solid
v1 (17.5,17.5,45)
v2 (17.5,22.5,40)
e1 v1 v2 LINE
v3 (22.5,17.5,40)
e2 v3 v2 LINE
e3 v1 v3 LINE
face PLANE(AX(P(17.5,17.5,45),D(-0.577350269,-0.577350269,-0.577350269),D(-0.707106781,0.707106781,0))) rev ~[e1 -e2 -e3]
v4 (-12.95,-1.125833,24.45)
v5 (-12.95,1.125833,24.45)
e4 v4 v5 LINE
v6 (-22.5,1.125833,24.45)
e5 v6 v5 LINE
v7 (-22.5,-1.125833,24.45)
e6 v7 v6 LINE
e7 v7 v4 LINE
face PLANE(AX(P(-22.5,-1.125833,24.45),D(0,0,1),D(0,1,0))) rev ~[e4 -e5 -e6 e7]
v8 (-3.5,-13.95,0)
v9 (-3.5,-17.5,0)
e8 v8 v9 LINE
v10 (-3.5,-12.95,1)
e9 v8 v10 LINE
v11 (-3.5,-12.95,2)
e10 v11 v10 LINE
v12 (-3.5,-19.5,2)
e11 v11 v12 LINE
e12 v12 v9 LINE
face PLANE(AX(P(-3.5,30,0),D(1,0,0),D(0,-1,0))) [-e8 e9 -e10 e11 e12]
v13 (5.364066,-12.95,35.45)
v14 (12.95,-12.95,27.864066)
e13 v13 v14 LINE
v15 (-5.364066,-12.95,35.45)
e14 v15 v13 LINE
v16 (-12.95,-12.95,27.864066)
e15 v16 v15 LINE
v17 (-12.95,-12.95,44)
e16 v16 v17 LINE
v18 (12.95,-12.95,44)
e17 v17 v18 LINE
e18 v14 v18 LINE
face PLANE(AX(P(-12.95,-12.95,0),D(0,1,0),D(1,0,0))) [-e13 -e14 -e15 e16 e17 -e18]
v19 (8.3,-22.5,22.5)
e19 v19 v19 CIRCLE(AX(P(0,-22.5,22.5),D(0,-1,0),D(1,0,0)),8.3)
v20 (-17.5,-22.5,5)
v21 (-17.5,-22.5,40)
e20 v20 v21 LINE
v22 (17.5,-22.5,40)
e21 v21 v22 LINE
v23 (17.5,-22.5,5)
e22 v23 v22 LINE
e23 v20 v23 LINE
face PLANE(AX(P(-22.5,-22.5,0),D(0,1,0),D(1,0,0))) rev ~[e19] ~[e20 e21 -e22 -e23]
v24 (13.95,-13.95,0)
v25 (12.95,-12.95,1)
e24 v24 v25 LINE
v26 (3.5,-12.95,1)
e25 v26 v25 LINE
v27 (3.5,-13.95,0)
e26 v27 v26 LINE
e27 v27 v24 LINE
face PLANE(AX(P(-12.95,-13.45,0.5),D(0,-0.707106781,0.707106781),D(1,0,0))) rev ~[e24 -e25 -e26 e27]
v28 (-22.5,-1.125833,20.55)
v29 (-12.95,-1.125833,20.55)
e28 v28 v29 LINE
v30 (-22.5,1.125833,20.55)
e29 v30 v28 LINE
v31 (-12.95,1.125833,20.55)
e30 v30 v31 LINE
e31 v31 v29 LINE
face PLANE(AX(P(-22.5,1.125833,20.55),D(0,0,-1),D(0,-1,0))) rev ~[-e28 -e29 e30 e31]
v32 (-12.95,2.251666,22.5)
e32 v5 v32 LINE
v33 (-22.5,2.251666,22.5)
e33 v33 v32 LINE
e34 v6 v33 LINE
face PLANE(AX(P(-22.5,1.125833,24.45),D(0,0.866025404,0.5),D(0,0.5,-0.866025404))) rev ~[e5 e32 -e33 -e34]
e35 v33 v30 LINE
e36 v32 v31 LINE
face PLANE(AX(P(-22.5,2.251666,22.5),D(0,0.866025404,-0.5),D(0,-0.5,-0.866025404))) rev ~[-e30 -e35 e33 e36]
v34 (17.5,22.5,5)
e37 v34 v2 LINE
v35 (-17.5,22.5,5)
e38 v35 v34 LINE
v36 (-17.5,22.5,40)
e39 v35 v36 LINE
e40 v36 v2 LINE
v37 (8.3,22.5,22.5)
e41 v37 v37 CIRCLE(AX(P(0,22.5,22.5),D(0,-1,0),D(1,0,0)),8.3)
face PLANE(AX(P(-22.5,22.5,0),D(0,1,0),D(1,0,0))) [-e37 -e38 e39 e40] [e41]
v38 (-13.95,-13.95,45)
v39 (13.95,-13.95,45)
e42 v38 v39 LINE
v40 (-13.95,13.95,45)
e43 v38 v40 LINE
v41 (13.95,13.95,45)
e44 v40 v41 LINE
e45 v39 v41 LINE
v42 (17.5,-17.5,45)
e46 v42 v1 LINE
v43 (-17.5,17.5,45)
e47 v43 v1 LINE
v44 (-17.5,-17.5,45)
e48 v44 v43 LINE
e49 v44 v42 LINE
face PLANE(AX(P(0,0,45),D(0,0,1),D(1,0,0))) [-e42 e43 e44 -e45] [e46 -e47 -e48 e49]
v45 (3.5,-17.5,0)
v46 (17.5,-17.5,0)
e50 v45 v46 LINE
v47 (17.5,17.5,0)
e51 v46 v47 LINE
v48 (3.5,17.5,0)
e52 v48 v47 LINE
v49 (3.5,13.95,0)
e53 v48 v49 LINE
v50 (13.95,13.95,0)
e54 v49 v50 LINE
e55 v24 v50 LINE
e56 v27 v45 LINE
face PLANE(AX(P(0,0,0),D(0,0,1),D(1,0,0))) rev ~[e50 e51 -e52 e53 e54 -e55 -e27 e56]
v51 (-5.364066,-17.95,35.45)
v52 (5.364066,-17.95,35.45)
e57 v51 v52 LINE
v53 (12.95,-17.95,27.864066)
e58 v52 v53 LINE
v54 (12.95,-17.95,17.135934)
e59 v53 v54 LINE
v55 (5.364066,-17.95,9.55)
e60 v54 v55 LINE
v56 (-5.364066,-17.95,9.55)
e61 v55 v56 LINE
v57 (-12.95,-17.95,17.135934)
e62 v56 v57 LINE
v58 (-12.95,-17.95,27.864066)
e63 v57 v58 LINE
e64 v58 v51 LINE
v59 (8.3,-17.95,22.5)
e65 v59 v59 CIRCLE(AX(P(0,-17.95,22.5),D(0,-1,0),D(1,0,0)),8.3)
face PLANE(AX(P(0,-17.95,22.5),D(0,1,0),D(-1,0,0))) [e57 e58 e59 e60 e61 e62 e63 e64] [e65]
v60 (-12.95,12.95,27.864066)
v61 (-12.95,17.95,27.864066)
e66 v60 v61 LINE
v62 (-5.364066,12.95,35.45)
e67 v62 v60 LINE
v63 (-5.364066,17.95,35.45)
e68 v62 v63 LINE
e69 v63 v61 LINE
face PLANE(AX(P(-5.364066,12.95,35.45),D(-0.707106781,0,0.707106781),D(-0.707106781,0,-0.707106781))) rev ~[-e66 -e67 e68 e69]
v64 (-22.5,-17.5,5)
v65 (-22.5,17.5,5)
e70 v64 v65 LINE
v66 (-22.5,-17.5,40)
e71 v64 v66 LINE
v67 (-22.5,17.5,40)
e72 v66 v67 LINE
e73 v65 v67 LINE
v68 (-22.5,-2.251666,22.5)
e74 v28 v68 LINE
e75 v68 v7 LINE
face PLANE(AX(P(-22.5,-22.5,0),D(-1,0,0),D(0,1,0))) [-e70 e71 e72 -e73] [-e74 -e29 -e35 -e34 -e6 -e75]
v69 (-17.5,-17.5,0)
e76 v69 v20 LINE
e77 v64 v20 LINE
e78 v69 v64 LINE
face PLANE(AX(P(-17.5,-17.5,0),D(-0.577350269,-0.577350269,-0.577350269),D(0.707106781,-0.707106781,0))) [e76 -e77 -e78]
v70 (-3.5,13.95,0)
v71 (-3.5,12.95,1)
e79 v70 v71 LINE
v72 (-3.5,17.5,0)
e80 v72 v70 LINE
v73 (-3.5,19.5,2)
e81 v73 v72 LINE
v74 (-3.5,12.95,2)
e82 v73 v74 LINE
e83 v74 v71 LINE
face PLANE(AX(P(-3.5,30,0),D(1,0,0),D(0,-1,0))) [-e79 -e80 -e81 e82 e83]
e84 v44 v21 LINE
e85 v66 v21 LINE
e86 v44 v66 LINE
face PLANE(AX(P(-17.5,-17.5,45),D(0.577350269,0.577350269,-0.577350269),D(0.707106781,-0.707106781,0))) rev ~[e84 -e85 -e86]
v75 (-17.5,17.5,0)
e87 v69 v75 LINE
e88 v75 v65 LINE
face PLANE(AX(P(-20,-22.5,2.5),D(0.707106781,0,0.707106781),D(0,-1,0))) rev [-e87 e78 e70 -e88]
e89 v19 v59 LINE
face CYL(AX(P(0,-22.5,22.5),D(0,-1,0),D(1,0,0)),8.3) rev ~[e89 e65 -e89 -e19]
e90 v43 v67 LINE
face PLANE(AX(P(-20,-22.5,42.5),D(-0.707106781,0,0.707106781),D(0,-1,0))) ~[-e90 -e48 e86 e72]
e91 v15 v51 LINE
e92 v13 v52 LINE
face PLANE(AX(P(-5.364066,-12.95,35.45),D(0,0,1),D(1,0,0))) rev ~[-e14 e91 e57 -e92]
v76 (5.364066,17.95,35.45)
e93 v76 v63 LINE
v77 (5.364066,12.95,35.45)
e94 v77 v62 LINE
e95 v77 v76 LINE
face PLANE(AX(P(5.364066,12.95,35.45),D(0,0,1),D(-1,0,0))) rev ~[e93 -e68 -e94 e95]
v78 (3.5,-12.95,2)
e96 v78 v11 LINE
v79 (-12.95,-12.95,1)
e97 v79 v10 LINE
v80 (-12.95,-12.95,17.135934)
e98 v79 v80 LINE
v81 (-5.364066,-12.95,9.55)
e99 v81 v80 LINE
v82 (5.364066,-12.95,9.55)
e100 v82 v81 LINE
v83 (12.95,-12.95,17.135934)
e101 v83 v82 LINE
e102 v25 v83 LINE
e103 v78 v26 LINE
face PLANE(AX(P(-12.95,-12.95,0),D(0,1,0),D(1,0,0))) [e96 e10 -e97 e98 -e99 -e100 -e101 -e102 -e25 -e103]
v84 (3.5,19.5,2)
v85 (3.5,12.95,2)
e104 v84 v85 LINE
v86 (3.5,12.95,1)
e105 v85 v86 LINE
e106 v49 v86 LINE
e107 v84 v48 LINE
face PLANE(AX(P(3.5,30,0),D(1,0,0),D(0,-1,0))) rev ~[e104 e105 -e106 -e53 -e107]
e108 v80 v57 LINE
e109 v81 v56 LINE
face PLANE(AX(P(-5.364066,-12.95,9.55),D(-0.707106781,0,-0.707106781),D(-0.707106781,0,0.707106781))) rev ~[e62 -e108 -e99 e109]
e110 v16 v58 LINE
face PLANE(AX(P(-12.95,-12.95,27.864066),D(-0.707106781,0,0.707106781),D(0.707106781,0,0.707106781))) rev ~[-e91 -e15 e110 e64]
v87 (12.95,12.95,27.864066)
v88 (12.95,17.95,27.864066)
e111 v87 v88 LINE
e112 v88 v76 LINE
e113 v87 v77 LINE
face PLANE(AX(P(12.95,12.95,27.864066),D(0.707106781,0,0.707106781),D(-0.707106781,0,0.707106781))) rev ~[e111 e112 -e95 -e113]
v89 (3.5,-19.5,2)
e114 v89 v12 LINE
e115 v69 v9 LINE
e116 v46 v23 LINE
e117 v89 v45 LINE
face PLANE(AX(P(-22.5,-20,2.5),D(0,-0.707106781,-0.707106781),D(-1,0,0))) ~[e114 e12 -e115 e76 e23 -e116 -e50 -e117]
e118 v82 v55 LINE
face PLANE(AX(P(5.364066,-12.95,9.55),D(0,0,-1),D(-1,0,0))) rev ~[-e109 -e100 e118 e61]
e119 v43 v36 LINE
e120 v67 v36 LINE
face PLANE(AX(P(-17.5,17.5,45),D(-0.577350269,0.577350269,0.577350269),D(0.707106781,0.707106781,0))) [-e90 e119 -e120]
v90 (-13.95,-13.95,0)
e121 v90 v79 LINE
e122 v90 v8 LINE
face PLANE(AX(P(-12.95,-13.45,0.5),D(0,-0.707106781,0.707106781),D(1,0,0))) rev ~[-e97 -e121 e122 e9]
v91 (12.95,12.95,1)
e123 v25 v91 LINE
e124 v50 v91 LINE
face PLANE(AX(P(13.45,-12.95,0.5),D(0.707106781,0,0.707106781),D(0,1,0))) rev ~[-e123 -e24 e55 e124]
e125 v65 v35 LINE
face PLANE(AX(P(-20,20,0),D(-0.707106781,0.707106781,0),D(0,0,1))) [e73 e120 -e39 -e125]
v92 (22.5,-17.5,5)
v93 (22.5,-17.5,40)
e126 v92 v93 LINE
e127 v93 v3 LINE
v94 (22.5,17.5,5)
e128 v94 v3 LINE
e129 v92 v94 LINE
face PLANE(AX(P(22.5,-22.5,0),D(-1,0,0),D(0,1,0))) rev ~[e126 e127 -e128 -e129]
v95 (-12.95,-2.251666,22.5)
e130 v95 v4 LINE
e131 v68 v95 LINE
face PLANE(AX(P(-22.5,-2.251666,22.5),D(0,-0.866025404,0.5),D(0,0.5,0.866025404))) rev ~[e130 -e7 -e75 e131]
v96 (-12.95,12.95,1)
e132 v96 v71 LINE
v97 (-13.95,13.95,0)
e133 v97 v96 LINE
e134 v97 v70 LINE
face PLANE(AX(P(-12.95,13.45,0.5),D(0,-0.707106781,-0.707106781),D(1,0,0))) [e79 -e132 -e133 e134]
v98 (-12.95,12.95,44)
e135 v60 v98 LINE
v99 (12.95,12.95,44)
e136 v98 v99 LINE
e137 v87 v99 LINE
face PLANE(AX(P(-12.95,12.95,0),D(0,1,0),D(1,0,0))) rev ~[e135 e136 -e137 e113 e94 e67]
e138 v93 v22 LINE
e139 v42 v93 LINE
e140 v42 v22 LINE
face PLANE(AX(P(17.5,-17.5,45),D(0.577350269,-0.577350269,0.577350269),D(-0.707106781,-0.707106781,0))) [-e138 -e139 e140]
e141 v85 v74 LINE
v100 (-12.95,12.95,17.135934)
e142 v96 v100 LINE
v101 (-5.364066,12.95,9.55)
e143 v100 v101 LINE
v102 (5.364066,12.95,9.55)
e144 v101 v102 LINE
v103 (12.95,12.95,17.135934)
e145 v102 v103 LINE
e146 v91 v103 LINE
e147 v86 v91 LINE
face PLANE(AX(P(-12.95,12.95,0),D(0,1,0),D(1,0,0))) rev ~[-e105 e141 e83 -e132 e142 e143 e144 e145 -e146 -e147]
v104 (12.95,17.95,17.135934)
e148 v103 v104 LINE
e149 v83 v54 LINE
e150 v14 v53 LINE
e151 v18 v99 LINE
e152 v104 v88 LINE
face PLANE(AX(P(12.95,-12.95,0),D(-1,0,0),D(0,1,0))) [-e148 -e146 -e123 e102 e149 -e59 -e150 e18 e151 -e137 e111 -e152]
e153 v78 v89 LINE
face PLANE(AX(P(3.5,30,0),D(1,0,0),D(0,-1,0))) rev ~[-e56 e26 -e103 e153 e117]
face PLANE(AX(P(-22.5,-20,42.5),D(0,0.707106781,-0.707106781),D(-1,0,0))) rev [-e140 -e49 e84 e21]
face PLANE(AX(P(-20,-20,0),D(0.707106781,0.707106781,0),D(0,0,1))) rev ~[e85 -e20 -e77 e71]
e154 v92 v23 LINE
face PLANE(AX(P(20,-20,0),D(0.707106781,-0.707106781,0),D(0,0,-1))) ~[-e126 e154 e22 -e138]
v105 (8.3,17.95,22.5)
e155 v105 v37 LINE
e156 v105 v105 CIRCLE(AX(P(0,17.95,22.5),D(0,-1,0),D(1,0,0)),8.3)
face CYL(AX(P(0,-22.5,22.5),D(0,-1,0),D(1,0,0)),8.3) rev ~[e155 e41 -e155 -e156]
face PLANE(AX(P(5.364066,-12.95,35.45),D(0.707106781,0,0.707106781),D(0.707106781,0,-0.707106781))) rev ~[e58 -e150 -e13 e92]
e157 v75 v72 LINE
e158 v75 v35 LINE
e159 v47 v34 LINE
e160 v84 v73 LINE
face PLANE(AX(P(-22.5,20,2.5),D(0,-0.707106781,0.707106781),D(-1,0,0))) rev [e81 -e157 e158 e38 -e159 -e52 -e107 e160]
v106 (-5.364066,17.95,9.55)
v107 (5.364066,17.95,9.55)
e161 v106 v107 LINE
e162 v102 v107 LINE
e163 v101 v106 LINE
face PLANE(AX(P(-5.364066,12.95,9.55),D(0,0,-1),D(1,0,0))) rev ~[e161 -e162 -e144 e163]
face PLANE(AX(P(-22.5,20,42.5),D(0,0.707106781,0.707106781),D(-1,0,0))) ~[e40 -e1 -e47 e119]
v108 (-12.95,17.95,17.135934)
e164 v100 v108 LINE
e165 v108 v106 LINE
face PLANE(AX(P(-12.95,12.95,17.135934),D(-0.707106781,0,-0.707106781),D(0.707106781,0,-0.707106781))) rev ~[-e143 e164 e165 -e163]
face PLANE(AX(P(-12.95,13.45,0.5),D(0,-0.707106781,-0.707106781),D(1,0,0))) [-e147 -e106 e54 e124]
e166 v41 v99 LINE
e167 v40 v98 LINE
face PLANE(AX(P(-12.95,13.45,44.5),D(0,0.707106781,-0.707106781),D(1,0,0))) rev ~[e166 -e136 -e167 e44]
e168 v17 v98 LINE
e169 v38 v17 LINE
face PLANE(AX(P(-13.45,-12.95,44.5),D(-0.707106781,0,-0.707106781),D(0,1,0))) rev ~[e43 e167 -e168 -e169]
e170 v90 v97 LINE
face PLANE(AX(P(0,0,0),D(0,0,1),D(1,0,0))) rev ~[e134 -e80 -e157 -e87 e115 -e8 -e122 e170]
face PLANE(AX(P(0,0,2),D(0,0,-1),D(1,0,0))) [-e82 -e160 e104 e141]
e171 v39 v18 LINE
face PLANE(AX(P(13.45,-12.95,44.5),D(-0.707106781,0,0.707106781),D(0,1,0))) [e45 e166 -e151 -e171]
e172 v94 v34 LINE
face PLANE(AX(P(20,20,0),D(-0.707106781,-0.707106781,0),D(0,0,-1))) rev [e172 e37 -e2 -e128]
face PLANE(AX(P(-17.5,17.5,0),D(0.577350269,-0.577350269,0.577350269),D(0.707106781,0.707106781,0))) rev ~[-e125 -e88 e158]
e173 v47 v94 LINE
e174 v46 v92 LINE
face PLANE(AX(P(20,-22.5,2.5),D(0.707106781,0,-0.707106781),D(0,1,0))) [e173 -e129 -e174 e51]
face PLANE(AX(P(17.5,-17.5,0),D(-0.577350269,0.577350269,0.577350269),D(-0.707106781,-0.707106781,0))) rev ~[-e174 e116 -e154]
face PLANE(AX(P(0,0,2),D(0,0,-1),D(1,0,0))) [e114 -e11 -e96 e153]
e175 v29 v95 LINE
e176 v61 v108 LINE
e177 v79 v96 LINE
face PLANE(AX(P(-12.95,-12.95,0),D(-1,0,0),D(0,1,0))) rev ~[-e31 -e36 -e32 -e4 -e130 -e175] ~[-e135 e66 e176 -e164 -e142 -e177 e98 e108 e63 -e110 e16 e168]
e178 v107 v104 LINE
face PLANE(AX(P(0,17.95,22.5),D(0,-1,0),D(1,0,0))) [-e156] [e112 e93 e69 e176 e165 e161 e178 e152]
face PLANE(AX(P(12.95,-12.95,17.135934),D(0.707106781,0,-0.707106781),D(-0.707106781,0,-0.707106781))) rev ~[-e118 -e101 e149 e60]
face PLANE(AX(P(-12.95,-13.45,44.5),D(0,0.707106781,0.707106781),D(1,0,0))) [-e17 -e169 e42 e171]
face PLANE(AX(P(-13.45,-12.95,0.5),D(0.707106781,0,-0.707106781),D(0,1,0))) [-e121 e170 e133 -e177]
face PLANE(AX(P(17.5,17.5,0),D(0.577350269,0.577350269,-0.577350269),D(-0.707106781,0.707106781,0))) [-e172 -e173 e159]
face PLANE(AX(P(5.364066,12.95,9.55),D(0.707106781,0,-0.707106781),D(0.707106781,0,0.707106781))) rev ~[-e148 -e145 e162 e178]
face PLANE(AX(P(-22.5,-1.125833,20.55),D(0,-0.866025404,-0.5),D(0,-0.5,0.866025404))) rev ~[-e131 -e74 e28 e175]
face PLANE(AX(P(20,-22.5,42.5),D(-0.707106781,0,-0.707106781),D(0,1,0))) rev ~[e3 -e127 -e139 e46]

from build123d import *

# Parameters (mm, degrees)
F0_W      = 45
F0_H      = 45
F0_W_2    = 25.9
F0_H_2    = 25.9
F1_DEPTH  = 45
F2_R      = 8.3
F3_DEPTH  = 45.001
F5_DEPTH  = 5
F7_DEPTH  = 5
F9_SIZE   = 5
F10_DEPTH = 9.55
F11_SIZE  = 1
F12_W     = 7
F12_H     = 60
F13_DEPTH = 2


# Not quite as in the source:
# - a feature names something its author has since deleted; it is built from what else it names


with BuildPart() as f1:
    # F0 (on Top) → F1 (new body)
    with BuildSketch(Plane.XY):
        Rectangle(F0_W, F0_H)
        Rectangle(F0_W_2, F0_H_2, mode=Mode.SUBTRACT)
    extrude(amount=F1_DEPTH)

    # F2 (on face) → F3 (cut, through all)
    with BuildSketch(Plane.XZ.offset(22.5)):
        with Locations((0, 22.5)):
            Circle(F2_R)
    extrude(amount=-F3_DEPTH, mode=Mode.SUBTRACT)

    # F4 (on face) → F5 (cut)
    with BuildSketch(Plane.XZ.offset(-12.95)):
        Polygon((12.95, 17.1359343673), (12.95, 27.8640656327), (5.3640656327, 35.45), (-5.3640656327, 35.45), (-12.95, 27.8640656327), (-12.95, 17.1359343673), (-5.3640656327, 9.55), (5.3640656327, 9.55), align=None)
    extrude(amount=-F5_DEPTH, mode=Mode.SUBTRACT)

    # F6 (on face) → F7 (cut)
    with BuildSketch(Plane(origin=(0, -12.95, 0), x_dir=(-1, 0, 0), z_dir=(0, 1, 0))):
        Polygon((12.95, 17.1359343673), (12.95, 27.8640656327), (5.3640656327, 35.45), (-5.3640656327, 35.45), (-12.95, 27.8640656327), (-12.95, 17.1359343673), (-5.3640656327, 9.55), (5.3640656327, 9.55), align=None)
    extrude(amount=-F7_DEPTH, mode=Mode.SUBTRACT)

    # F9
    f9_edges = [f1.edges().sort_by_distance(p)[0] for p in [
        (22.5, -22.5, 22.5),
        (22.5, 22.5, 22.5),
        (22.5, 0, 0),
        (22.5, 0, 45),
        (-22.5, 22.5, 22.5),
        (-22.5, -22.5, 22.5),
        (-22.5, 0, 0),
        (-22.5, 0, 45),
        (0, -22.5, 0),
        (0, -22.5, 45),
        (0, 22.5, 45),
        (0, 22.5, 0),
    ]]
    chamfer(f9_edges, length=F9_SIZE)

    # F8 (on face) → F10 (cut, through all)
    with BuildSketch(Plane(origin=(-22.5, 0, 0), x_dir=(0, -1, 0), z_dir=(-1, 0, 0))):
        Polygon((1.1258330249, 20.55), (2.2516660498, 22.5), (1.1258330249, 24.45), (-1.1258330249, 24.45), (-2.2516660498, 22.5), (-1.1258330249, 20.55), align=None)
    extrude(amount=-F10_DEPTH, mode=Mode.SUBTRACT)

    # F11
    f11_edges = [f1.edges().sort_by_distance(p)[0] for p in [
        (12.95, 0, 45),
        (0, -12.95, 45),
        (-12.95, 0, 45),
        (0, 12.95, 45),
        (-12.95, 0, 0),
        (0, 12.95, 0),
        (12.95, 0, 0),
        (0, -12.95, 0),
    ]]
    chamfer(f11_edges, length=F11_SIZE)

    # F12 (on face) → F13 (cut)
    with BuildSketch(Plane(origin=(0, 0, 0), x_dir=(1, 0, 0), z_dir=(0, 0, -1))):
        Rectangle(F12_W, F12_H)
    extrude(amount=-F13_DEPTH, mode=Mode.SUBTRACT)


solid = f1.part
